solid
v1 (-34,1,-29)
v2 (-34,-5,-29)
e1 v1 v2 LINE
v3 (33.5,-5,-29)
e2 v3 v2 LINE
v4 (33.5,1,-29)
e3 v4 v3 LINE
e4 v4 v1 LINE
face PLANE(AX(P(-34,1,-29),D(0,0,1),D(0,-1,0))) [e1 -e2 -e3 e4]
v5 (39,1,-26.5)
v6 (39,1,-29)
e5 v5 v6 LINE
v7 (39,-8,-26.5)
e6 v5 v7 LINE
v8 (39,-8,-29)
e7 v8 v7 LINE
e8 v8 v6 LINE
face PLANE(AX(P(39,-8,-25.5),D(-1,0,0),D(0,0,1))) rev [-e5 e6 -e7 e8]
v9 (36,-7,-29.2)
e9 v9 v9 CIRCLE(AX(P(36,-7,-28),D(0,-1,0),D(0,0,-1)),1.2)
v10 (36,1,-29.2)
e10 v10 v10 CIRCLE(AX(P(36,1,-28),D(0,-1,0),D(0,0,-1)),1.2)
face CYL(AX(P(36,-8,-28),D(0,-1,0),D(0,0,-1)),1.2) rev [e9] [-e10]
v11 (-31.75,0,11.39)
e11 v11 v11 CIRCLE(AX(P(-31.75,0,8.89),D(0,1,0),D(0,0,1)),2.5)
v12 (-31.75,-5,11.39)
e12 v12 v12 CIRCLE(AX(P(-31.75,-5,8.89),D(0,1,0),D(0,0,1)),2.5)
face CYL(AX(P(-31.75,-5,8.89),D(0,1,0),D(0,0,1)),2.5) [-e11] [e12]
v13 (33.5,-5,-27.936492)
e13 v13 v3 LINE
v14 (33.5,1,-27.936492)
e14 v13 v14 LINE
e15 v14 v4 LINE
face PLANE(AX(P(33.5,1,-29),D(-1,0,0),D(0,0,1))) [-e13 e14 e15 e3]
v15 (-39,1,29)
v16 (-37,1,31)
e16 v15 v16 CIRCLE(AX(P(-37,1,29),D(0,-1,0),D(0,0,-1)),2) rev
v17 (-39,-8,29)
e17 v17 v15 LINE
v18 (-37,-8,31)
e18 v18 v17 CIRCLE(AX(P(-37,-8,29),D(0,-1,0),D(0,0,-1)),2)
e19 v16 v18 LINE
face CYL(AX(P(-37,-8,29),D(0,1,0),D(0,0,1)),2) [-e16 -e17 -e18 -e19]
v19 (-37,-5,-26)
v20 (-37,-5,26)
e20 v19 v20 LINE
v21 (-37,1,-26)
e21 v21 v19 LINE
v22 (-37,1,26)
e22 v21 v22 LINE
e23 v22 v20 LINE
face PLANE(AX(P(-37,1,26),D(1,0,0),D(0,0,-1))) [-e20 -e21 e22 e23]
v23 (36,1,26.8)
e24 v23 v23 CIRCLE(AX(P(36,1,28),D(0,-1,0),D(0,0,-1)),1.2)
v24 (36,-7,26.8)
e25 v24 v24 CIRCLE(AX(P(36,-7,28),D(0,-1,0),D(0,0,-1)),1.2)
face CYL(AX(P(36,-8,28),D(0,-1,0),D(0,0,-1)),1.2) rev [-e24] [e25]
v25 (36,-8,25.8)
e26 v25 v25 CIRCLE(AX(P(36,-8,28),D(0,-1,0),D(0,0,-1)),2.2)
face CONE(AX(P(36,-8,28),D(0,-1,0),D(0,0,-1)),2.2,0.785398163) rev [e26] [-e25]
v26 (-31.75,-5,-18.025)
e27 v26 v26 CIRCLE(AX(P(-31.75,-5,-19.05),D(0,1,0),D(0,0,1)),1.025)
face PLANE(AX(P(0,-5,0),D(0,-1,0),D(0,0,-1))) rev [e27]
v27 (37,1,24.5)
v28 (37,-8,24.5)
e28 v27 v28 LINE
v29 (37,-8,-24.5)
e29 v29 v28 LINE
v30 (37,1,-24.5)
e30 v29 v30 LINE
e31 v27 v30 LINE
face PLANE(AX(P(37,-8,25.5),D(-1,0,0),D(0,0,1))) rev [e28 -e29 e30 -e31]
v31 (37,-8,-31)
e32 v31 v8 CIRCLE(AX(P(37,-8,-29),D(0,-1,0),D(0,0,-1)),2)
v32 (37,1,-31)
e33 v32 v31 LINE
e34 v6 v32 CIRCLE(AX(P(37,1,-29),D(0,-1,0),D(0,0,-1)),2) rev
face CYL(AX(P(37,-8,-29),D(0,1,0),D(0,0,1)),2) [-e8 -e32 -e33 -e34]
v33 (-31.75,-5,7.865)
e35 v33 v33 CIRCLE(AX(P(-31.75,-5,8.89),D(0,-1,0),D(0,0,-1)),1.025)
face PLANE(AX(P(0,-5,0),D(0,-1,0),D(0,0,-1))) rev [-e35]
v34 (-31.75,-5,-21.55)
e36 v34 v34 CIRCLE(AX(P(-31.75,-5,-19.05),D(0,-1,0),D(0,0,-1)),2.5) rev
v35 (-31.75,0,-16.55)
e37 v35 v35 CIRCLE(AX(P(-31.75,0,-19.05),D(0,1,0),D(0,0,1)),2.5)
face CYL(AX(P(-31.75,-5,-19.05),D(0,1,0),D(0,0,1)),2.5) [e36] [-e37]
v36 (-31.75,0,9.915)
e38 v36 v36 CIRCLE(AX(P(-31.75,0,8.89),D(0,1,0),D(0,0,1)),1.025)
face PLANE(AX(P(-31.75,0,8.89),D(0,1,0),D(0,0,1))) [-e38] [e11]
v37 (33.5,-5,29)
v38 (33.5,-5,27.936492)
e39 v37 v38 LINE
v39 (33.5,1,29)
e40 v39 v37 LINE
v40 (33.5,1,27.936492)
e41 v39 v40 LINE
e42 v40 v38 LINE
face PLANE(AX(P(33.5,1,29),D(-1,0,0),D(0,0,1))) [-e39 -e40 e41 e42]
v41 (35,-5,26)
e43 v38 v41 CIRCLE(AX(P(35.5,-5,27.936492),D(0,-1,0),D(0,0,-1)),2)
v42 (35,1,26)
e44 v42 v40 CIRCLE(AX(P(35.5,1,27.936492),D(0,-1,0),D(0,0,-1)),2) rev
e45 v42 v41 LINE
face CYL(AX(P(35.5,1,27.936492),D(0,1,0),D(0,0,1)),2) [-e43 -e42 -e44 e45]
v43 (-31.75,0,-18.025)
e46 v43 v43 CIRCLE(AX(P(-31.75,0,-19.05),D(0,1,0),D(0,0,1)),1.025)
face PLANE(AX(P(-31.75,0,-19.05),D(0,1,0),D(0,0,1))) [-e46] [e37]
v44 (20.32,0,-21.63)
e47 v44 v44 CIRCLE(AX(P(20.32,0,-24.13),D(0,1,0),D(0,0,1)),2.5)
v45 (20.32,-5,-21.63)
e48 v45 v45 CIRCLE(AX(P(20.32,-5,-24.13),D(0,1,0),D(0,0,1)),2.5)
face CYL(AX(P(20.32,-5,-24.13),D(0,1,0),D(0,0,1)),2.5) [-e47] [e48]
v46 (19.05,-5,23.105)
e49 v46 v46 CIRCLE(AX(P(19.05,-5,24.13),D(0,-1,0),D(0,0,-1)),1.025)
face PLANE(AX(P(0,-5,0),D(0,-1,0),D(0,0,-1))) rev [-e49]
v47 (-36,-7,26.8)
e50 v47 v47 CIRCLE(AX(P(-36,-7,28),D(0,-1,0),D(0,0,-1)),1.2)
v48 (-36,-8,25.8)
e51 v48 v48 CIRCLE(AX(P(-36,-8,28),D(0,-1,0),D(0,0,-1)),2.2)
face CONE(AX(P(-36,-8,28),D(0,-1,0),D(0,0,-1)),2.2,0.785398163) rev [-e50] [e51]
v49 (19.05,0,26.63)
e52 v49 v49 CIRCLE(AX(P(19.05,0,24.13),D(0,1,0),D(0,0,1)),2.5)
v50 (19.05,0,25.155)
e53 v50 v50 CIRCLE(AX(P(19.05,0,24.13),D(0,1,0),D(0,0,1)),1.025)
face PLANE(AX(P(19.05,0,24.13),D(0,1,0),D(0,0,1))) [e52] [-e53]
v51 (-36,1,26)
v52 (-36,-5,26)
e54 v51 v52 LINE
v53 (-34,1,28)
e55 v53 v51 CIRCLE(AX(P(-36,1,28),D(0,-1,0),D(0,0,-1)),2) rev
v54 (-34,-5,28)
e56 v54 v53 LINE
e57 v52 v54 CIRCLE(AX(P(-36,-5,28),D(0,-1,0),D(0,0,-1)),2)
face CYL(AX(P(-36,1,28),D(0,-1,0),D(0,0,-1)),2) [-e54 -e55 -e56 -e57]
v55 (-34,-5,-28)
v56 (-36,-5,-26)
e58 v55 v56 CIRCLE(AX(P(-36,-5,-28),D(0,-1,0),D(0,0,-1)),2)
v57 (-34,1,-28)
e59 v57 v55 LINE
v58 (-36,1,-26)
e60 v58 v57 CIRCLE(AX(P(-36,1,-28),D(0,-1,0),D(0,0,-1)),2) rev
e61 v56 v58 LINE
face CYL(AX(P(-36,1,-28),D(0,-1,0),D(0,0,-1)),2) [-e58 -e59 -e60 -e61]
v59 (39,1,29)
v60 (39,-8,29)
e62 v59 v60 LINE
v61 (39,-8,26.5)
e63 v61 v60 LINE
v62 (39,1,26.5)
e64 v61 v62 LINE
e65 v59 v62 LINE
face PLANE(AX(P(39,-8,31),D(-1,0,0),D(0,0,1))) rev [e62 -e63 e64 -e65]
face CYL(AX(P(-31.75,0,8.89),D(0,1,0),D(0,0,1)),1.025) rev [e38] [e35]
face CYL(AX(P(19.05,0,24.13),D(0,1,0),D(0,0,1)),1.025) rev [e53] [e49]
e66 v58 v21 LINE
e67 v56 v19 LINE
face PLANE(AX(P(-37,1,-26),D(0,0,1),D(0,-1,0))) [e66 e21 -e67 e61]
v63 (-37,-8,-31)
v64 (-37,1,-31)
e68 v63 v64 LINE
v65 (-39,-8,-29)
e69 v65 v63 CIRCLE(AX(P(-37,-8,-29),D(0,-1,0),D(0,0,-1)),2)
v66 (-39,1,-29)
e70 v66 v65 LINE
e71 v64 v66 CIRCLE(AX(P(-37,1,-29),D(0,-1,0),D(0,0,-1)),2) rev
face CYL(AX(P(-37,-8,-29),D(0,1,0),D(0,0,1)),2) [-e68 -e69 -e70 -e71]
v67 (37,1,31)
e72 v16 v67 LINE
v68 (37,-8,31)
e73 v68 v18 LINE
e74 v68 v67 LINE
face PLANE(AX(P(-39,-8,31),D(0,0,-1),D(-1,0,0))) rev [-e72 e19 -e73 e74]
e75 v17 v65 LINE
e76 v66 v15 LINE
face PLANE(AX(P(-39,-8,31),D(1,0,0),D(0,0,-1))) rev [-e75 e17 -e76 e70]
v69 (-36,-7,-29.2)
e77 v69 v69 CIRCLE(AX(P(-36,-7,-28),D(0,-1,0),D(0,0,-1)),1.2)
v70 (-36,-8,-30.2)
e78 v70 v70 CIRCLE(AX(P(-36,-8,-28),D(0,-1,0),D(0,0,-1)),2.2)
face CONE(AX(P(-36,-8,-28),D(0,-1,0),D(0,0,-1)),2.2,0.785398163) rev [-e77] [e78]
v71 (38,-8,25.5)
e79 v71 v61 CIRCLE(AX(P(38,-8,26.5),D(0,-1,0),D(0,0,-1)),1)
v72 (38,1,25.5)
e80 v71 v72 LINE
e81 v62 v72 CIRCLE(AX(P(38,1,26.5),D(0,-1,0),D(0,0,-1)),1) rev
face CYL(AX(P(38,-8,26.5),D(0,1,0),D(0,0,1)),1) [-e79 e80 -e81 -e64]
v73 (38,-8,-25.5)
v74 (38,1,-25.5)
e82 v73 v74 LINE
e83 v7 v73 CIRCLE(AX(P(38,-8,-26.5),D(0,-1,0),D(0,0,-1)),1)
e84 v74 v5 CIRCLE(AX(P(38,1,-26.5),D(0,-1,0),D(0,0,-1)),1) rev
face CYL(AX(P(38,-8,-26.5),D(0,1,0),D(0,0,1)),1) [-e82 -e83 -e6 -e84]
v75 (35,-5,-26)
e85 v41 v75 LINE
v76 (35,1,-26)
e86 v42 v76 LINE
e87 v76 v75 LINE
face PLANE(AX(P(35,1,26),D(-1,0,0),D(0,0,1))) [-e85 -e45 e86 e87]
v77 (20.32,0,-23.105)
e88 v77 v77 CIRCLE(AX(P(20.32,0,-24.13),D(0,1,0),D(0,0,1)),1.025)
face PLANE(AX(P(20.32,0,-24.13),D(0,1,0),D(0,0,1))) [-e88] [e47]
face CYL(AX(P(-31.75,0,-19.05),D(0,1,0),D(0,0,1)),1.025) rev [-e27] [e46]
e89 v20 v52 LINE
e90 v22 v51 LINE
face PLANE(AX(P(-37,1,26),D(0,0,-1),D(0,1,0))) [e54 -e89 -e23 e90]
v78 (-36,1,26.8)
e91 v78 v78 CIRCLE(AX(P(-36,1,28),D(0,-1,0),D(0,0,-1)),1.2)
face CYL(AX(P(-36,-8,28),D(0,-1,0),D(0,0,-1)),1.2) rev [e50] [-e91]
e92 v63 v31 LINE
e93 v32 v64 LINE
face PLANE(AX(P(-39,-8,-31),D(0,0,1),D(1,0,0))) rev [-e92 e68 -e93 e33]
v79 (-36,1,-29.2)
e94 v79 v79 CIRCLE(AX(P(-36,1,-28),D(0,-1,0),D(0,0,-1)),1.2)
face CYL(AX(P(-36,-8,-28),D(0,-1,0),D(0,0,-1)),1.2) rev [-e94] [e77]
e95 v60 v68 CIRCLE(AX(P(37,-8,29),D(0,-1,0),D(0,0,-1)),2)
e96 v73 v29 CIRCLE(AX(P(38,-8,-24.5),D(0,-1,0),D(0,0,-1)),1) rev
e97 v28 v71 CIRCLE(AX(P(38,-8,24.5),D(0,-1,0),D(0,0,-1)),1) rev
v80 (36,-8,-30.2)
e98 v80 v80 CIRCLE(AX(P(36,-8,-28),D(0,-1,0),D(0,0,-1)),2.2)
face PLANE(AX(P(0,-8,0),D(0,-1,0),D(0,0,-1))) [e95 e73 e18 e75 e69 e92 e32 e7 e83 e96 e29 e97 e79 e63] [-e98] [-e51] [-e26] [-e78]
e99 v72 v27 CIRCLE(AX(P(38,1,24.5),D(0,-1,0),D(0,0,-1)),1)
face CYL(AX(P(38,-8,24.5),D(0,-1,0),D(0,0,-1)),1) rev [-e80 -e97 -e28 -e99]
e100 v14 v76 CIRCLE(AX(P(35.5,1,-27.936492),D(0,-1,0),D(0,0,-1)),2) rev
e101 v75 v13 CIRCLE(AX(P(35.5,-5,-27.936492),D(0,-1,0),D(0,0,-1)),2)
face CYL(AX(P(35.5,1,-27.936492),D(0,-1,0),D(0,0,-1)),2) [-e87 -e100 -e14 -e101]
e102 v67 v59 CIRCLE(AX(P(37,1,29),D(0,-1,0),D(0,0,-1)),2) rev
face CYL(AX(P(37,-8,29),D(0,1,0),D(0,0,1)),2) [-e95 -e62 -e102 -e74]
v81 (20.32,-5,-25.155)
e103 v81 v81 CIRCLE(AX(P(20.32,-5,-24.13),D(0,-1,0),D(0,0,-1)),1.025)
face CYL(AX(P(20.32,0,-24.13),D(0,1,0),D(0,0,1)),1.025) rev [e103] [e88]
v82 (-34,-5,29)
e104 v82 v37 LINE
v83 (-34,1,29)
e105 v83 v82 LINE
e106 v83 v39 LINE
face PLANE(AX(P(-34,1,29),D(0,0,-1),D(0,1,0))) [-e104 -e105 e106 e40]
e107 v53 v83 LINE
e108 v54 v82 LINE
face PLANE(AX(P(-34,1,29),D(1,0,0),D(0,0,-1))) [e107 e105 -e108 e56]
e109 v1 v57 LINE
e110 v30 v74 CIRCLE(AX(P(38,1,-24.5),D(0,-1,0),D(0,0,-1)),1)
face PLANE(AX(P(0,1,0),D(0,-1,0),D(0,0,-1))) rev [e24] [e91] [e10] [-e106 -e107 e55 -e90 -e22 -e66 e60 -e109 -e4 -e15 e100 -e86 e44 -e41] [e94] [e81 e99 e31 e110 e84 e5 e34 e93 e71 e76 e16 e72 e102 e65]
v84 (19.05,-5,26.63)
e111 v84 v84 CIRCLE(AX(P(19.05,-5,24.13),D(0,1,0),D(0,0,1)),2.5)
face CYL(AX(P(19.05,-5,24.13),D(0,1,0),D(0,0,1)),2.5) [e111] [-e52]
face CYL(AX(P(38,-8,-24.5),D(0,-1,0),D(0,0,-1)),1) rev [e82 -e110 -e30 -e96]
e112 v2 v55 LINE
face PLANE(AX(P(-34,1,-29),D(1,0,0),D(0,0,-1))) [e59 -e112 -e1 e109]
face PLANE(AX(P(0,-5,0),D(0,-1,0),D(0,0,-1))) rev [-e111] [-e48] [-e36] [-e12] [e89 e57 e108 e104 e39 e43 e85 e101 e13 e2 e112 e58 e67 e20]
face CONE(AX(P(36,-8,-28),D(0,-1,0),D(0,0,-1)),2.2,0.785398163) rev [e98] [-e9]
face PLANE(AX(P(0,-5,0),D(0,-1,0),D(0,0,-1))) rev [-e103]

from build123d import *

# Parameters (mm, degrees)
SKETCH1_R                                           = 2.5
BOSS_EXTRUDE1_DEPTH                                 = 5
BOSS_EXTRUDE1_2_DEPTH                               = 5
BOSS_EXTRUDE1_3_DEPTH                               = 5
BOSS_EXTRUDE1_4_DEPTH                               = 5
M2_5_TAPPED_HOLE1_AT_2_COUNT                        = 2
M2_5_TAPPED_HOLE1_AT_2_PITCH                        = 27.94
M2_5_TAPPED_HOLE1_AT_3_COUNT                        = 2
M2_5_TAPPED_HOLE1_AT_3_PITCH                        = 52.317218007
M2_5_TAPPED_HOLE1_AT_4_COUNT                        = 2
M2_5_TAPPED_HOLE1_AT_4_PITCH                        = 66.671976122
BOSS_EXTRUDE2_DEPTH                                 = 3
BOSS_EXTRUDE3_DEPTH                                 = 6
FILLET5_R                                           = 2
CSK_FOR_M2_COUNTERSUNK_FLAT_HEAD_SCREW1_D           = 2.4
CSK_FOR_M2_COUNTERSUNK_FLAT_HEAD_SCREW1_CSINK_D     = 4.4
CSK_FOR_M2_COUNTERSUNK_FLAT_HEAD_SCREW1_CSINK_ANGLE = 90
FILLET6_R                                           = 2
FILLET7_R                                           = 1


# Some blends are built 0.0001 mm under size
with BuildPart() as part:
    # Sketch1 → Boss-Extrude1 (new body)
    with BuildSketch(Plane(origin=(0, 0, 0), x_dir=(1, 0, 0), z_dir=(0, 1, 0))):
        with Locations(Location((-31.75, 19.05, 0), (0, 0, 270))):
            Circle(SKETCH1_R)
    extrude(amount=-BOSS_EXTRUDE1_DEPTH)

    # Sketch13 → M2.5 Tapped Hole1 (revolve, cut)
    with BuildSketch(Plane(origin=(-31.75, 0, -19.05), x_dir=(0, 0, 1), z_dir=(1, 0, 0))):
        Polygon((0, 0), (0, 6.965882135), (1.025, 6.35), (1.025, 0), align=None)
    m2_5_tapped_hole1 = revolve(axis=Axis((-31.75, 6.35, -19.05), (0, -1, 0)), mode=Mode.SUBTRACT)



with BuildPart() as body_2:
    # Sketch1 → Boss-Extrude1 2 (new body)
    with BuildSketch(Plane(origin=(0, 0, 0), x_dir=(1, 0, 0), z_dir=(0, 1, 0))):
        with Locations(Location((-31.75, -8.89, 0), (0, 0, 270))):
            Circle(SKETCH1_R)
    extrude(amount=-BOSS_EXTRUDE1_2_DEPTH)

    # M2.5 Tapped Hole1 at 2: M2.5 Tapped Hole1 ×2
    with Locations(*[(0, 0, i * M2_5_TAPPED_HOLE1_AT_2_PITCH) for i in range(1, M2_5_TAPPED_HOLE1_AT_2_COUNT)]):
        add(m2_5_tapped_hole1, mode=Mode.SUBTRACT)


with BuildPart() as body_3:
    # Sketch1 → Boss-Extrude1 3 (new body)
    with BuildSketch(Plane(origin=(0, 0, 0), x_dir=(1, 0, 0), z_dir=(0, 1, 0))):
        with Locations(Location((20.32, 24.13, 0), (0, 0, 270))):
            Circle(SKETCH1_R)
    extrude(amount=-BOSS_EXTRUDE1_3_DEPTH)

    # M2.5 Tapped Hole1 at 3: M2.5 Tapped Hole1 ×2
    with Locations(*[Vector(0.9952746339256161, 0, -0.097099964285426) * (i * M2_5_TAPPED_HOLE1_AT_3_PITCH) for i in range(1, M2_5_TAPPED_HOLE1_AT_3_COUNT)]):
        add(m2_5_tapped_hole1, mode=Mode.SUBTRACT)


with BuildPart() as body_4:
    # Sketch1 → Boss-Extrude1 4 (new body)
    with BuildSketch(Plane(origin=(0, 0, 0), x_dir=(1, 0, 0), z_dir=(0, 1, 0))):
        with Locations(Location((19.05, -24.13, 0), (0, 0, 270))):
            Circle(SKETCH1_R)
    extrude(amount=-BOSS_EXTRUDE1_4_DEPTH)

    # M2.5 Tapped Hole1 at 4: M2.5 Tapped Hole1 ×2
    with Locations(*[Vector(0.7619393177594593, 0, 0.6476484200955406) * (i * M2_5_TAPPED_HOLE1_AT_4_PITCH) for i in range(1, M2_5_TAPPED_HOLE1_AT_4_COUNT)]):
        add(m2_5_tapped_hole1, mode=Mode.SUBTRACT)


with BuildPart() as part_1:
    add(part.part)

    add(body_2.part)  # Boss-Extrude2 merges body 2

    add(body_3.part)  # Boss-Extrude2 merges body 3

    add(body_4.part)  # Boss-Extrude2 merges body 4
    # Sketch3 → Boss-Extrude2 (add)
    with BuildSketch(Plane.XZ.offset(5)):
        Polygon((-39, 31), (39, 31), (39, 25.5), (37, 25.5), (37, -25.5), (39, -25.5), (39, -31), (-39, -31), align=None)
    extrude(amount=BOSS_EXTRUDE2_DEPTH)

    # Sketch4 → Boss-Extrude3 (add)
    with BuildSketch(Plane(origin=(0, -5, 0), x_dir=(1, 0, 0), z_dir=(0, 1, 0))):
        Polygon((-39, -31), (39, -31), (39, -25.5), (37, -25.5), (37, 25.5), (39, 25.5), (39, 31), (-39, 31), align=None)
        Polygon((-34, -29), (33.5, -29), (33.5, -26), (35, -26), (35, 26), (33.5, 26), (33.5, 29), (-34, 29), (-34, 26), (-37, 26), (-37, -26), (-34, -26), align=None, mode=Mode.SUBTRACT)
    extrude(amount=BOSS_EXTRUDE3_DEPTH)

    # Fillet5
    # the kernel refuses this fillet: 2 mm, written as the material it takes off along each edge
    with BuildSketch(Plane(origin=(33.5, -5, 26), x_dir=(0, 0, 1), z_dir=(0, 1, 0))) as fillet5_piece_1:
        with BuildLine():
            CenterArc((1.936491673, 2), FILLET5_R, 194.477512186, 75.522487814)
            Line((0, 1.5), (-0.038729833, 1.49))
            ThreePointArc((-0.038729833, 1.49), (-0.04, 0.75), (-0.04, 0))
            Line((-0.04, 0), (0, -0.04))
            Line((0, -0.04), (1.936491673, -0.04))
            Line((1.936491673, -0.04), (1.936491673, 0))
        make_face()
    extrude(amount=10.841229183, mode=Mode.SUBTRACT)
    with BuildSketch(Plane(origin=(33.5, -5, -26), x_dir=(1, 0, 0), z_dir=(0, 1, 0))) as fillet5_piece_2:
        with BuildLine():
            CenterArc((2, 1.936491673), FILLET5_R, 180, 75.522487814)
            Line((0, 1.936491673), (-0.04, 1.936491673))
            Line((-0.04, 1.936491673), (-0.04, 0))
            Line((-0.04, 0), (0, -0.04))
            ThreePointArc((0, -0.04), (0.75, -0.04), (1.49, -0.038729833))
            Line((1.49, -0.038729833), (1.5, 0))
        make_face()
    extrude(amount=10.841229183, mode=Mode.SUBTRACT)
    with BuildSketch(Plane(origin=(-34, -5, -26), x_dir=(0, 0, -1), z_dir=(0, 1, 0)), Plane(origin=(-34, -5, 26), x_dir=(-1, 0, 0), z_dir=(0, 1, 0))) as fillet5_piece_3:
        with BuildLine():
            CenterArc((FILLET5_R, FILLET5_R), FILLET5_R, 180, 90)
            Line((0, FILLET5_R), (-FILLET5_R * 0.02, FILLET5_R))
            Line((-FILLET5_R * 0.02, FILLET5_R), (-FILLET5_R * 0.02, -FILLET5_R * 0.02))
            Line((-FILLET5_R * 0.02, -FILLET5_R * 0.02), (FILLET5_R, -FILLET5_R * 0.02))
            Line((FILLET5_R, -FILLET5_R * 0.02), (FILLET5_R, 0))
        make_face()
    extrude(amount=11, mode=Mode.SUBTRACT)

    # CSK for M2 Countersunk Flat Head Screw1 (through all)
    with Locations(Plane(origin=(0, -8, 0), x_dir=(-1, 0, 0), z_dir=(0, -1, 0))):
        with Locations((-36, 28), (36, 28), (36, -28), (-36, -28)):
            CounterSinkHole(CSK_FOR_M2_COUNTERSUNK_FLAT_HEAD_SCREW1_D / 2, CSK_FOR_M2_COUNTERSUNK_FLAT_HEAD_SCREW1_CSINK_D / 2, counter_sink_angle=CSK_FOR_M2_COUNTERSUNK_FLAT_HEAD_SCREW1_CSINK_ANGLE)

    # Fillet6
    fillet6_edges = [part_1.edges().sort_by_distance(p)[0] for p in [
        (39, -3.5, -31),
        (39, -3.5, 31),
        (-39, -3.5, 31),
        (-39, -3.5, -31),
    ]]
    fillet(fillet6_edges, radius=FILLET6_R)

    # Fillet7
    fillet7_edges = [part_1.edges().sort_by_distance(p)[0] for p in [
        (37, -3.5, -25.5),
        (37, -3.5, 25.5),
    ]]
    fillet(fillet7_edges, radius=FILLET7_R)
    fillet7_2_edges = [part_1.edges().sort_by_distance(p)[0] for p in [
        (39, -3.5, -25.5),
        (39, -3.5, 25.5),
    ]]
    fillet(fillet7_2_edges, radius=FILLET7_R - 0.0001)  # a hair under: the kernel refuses the full size


solid = part_1.part
